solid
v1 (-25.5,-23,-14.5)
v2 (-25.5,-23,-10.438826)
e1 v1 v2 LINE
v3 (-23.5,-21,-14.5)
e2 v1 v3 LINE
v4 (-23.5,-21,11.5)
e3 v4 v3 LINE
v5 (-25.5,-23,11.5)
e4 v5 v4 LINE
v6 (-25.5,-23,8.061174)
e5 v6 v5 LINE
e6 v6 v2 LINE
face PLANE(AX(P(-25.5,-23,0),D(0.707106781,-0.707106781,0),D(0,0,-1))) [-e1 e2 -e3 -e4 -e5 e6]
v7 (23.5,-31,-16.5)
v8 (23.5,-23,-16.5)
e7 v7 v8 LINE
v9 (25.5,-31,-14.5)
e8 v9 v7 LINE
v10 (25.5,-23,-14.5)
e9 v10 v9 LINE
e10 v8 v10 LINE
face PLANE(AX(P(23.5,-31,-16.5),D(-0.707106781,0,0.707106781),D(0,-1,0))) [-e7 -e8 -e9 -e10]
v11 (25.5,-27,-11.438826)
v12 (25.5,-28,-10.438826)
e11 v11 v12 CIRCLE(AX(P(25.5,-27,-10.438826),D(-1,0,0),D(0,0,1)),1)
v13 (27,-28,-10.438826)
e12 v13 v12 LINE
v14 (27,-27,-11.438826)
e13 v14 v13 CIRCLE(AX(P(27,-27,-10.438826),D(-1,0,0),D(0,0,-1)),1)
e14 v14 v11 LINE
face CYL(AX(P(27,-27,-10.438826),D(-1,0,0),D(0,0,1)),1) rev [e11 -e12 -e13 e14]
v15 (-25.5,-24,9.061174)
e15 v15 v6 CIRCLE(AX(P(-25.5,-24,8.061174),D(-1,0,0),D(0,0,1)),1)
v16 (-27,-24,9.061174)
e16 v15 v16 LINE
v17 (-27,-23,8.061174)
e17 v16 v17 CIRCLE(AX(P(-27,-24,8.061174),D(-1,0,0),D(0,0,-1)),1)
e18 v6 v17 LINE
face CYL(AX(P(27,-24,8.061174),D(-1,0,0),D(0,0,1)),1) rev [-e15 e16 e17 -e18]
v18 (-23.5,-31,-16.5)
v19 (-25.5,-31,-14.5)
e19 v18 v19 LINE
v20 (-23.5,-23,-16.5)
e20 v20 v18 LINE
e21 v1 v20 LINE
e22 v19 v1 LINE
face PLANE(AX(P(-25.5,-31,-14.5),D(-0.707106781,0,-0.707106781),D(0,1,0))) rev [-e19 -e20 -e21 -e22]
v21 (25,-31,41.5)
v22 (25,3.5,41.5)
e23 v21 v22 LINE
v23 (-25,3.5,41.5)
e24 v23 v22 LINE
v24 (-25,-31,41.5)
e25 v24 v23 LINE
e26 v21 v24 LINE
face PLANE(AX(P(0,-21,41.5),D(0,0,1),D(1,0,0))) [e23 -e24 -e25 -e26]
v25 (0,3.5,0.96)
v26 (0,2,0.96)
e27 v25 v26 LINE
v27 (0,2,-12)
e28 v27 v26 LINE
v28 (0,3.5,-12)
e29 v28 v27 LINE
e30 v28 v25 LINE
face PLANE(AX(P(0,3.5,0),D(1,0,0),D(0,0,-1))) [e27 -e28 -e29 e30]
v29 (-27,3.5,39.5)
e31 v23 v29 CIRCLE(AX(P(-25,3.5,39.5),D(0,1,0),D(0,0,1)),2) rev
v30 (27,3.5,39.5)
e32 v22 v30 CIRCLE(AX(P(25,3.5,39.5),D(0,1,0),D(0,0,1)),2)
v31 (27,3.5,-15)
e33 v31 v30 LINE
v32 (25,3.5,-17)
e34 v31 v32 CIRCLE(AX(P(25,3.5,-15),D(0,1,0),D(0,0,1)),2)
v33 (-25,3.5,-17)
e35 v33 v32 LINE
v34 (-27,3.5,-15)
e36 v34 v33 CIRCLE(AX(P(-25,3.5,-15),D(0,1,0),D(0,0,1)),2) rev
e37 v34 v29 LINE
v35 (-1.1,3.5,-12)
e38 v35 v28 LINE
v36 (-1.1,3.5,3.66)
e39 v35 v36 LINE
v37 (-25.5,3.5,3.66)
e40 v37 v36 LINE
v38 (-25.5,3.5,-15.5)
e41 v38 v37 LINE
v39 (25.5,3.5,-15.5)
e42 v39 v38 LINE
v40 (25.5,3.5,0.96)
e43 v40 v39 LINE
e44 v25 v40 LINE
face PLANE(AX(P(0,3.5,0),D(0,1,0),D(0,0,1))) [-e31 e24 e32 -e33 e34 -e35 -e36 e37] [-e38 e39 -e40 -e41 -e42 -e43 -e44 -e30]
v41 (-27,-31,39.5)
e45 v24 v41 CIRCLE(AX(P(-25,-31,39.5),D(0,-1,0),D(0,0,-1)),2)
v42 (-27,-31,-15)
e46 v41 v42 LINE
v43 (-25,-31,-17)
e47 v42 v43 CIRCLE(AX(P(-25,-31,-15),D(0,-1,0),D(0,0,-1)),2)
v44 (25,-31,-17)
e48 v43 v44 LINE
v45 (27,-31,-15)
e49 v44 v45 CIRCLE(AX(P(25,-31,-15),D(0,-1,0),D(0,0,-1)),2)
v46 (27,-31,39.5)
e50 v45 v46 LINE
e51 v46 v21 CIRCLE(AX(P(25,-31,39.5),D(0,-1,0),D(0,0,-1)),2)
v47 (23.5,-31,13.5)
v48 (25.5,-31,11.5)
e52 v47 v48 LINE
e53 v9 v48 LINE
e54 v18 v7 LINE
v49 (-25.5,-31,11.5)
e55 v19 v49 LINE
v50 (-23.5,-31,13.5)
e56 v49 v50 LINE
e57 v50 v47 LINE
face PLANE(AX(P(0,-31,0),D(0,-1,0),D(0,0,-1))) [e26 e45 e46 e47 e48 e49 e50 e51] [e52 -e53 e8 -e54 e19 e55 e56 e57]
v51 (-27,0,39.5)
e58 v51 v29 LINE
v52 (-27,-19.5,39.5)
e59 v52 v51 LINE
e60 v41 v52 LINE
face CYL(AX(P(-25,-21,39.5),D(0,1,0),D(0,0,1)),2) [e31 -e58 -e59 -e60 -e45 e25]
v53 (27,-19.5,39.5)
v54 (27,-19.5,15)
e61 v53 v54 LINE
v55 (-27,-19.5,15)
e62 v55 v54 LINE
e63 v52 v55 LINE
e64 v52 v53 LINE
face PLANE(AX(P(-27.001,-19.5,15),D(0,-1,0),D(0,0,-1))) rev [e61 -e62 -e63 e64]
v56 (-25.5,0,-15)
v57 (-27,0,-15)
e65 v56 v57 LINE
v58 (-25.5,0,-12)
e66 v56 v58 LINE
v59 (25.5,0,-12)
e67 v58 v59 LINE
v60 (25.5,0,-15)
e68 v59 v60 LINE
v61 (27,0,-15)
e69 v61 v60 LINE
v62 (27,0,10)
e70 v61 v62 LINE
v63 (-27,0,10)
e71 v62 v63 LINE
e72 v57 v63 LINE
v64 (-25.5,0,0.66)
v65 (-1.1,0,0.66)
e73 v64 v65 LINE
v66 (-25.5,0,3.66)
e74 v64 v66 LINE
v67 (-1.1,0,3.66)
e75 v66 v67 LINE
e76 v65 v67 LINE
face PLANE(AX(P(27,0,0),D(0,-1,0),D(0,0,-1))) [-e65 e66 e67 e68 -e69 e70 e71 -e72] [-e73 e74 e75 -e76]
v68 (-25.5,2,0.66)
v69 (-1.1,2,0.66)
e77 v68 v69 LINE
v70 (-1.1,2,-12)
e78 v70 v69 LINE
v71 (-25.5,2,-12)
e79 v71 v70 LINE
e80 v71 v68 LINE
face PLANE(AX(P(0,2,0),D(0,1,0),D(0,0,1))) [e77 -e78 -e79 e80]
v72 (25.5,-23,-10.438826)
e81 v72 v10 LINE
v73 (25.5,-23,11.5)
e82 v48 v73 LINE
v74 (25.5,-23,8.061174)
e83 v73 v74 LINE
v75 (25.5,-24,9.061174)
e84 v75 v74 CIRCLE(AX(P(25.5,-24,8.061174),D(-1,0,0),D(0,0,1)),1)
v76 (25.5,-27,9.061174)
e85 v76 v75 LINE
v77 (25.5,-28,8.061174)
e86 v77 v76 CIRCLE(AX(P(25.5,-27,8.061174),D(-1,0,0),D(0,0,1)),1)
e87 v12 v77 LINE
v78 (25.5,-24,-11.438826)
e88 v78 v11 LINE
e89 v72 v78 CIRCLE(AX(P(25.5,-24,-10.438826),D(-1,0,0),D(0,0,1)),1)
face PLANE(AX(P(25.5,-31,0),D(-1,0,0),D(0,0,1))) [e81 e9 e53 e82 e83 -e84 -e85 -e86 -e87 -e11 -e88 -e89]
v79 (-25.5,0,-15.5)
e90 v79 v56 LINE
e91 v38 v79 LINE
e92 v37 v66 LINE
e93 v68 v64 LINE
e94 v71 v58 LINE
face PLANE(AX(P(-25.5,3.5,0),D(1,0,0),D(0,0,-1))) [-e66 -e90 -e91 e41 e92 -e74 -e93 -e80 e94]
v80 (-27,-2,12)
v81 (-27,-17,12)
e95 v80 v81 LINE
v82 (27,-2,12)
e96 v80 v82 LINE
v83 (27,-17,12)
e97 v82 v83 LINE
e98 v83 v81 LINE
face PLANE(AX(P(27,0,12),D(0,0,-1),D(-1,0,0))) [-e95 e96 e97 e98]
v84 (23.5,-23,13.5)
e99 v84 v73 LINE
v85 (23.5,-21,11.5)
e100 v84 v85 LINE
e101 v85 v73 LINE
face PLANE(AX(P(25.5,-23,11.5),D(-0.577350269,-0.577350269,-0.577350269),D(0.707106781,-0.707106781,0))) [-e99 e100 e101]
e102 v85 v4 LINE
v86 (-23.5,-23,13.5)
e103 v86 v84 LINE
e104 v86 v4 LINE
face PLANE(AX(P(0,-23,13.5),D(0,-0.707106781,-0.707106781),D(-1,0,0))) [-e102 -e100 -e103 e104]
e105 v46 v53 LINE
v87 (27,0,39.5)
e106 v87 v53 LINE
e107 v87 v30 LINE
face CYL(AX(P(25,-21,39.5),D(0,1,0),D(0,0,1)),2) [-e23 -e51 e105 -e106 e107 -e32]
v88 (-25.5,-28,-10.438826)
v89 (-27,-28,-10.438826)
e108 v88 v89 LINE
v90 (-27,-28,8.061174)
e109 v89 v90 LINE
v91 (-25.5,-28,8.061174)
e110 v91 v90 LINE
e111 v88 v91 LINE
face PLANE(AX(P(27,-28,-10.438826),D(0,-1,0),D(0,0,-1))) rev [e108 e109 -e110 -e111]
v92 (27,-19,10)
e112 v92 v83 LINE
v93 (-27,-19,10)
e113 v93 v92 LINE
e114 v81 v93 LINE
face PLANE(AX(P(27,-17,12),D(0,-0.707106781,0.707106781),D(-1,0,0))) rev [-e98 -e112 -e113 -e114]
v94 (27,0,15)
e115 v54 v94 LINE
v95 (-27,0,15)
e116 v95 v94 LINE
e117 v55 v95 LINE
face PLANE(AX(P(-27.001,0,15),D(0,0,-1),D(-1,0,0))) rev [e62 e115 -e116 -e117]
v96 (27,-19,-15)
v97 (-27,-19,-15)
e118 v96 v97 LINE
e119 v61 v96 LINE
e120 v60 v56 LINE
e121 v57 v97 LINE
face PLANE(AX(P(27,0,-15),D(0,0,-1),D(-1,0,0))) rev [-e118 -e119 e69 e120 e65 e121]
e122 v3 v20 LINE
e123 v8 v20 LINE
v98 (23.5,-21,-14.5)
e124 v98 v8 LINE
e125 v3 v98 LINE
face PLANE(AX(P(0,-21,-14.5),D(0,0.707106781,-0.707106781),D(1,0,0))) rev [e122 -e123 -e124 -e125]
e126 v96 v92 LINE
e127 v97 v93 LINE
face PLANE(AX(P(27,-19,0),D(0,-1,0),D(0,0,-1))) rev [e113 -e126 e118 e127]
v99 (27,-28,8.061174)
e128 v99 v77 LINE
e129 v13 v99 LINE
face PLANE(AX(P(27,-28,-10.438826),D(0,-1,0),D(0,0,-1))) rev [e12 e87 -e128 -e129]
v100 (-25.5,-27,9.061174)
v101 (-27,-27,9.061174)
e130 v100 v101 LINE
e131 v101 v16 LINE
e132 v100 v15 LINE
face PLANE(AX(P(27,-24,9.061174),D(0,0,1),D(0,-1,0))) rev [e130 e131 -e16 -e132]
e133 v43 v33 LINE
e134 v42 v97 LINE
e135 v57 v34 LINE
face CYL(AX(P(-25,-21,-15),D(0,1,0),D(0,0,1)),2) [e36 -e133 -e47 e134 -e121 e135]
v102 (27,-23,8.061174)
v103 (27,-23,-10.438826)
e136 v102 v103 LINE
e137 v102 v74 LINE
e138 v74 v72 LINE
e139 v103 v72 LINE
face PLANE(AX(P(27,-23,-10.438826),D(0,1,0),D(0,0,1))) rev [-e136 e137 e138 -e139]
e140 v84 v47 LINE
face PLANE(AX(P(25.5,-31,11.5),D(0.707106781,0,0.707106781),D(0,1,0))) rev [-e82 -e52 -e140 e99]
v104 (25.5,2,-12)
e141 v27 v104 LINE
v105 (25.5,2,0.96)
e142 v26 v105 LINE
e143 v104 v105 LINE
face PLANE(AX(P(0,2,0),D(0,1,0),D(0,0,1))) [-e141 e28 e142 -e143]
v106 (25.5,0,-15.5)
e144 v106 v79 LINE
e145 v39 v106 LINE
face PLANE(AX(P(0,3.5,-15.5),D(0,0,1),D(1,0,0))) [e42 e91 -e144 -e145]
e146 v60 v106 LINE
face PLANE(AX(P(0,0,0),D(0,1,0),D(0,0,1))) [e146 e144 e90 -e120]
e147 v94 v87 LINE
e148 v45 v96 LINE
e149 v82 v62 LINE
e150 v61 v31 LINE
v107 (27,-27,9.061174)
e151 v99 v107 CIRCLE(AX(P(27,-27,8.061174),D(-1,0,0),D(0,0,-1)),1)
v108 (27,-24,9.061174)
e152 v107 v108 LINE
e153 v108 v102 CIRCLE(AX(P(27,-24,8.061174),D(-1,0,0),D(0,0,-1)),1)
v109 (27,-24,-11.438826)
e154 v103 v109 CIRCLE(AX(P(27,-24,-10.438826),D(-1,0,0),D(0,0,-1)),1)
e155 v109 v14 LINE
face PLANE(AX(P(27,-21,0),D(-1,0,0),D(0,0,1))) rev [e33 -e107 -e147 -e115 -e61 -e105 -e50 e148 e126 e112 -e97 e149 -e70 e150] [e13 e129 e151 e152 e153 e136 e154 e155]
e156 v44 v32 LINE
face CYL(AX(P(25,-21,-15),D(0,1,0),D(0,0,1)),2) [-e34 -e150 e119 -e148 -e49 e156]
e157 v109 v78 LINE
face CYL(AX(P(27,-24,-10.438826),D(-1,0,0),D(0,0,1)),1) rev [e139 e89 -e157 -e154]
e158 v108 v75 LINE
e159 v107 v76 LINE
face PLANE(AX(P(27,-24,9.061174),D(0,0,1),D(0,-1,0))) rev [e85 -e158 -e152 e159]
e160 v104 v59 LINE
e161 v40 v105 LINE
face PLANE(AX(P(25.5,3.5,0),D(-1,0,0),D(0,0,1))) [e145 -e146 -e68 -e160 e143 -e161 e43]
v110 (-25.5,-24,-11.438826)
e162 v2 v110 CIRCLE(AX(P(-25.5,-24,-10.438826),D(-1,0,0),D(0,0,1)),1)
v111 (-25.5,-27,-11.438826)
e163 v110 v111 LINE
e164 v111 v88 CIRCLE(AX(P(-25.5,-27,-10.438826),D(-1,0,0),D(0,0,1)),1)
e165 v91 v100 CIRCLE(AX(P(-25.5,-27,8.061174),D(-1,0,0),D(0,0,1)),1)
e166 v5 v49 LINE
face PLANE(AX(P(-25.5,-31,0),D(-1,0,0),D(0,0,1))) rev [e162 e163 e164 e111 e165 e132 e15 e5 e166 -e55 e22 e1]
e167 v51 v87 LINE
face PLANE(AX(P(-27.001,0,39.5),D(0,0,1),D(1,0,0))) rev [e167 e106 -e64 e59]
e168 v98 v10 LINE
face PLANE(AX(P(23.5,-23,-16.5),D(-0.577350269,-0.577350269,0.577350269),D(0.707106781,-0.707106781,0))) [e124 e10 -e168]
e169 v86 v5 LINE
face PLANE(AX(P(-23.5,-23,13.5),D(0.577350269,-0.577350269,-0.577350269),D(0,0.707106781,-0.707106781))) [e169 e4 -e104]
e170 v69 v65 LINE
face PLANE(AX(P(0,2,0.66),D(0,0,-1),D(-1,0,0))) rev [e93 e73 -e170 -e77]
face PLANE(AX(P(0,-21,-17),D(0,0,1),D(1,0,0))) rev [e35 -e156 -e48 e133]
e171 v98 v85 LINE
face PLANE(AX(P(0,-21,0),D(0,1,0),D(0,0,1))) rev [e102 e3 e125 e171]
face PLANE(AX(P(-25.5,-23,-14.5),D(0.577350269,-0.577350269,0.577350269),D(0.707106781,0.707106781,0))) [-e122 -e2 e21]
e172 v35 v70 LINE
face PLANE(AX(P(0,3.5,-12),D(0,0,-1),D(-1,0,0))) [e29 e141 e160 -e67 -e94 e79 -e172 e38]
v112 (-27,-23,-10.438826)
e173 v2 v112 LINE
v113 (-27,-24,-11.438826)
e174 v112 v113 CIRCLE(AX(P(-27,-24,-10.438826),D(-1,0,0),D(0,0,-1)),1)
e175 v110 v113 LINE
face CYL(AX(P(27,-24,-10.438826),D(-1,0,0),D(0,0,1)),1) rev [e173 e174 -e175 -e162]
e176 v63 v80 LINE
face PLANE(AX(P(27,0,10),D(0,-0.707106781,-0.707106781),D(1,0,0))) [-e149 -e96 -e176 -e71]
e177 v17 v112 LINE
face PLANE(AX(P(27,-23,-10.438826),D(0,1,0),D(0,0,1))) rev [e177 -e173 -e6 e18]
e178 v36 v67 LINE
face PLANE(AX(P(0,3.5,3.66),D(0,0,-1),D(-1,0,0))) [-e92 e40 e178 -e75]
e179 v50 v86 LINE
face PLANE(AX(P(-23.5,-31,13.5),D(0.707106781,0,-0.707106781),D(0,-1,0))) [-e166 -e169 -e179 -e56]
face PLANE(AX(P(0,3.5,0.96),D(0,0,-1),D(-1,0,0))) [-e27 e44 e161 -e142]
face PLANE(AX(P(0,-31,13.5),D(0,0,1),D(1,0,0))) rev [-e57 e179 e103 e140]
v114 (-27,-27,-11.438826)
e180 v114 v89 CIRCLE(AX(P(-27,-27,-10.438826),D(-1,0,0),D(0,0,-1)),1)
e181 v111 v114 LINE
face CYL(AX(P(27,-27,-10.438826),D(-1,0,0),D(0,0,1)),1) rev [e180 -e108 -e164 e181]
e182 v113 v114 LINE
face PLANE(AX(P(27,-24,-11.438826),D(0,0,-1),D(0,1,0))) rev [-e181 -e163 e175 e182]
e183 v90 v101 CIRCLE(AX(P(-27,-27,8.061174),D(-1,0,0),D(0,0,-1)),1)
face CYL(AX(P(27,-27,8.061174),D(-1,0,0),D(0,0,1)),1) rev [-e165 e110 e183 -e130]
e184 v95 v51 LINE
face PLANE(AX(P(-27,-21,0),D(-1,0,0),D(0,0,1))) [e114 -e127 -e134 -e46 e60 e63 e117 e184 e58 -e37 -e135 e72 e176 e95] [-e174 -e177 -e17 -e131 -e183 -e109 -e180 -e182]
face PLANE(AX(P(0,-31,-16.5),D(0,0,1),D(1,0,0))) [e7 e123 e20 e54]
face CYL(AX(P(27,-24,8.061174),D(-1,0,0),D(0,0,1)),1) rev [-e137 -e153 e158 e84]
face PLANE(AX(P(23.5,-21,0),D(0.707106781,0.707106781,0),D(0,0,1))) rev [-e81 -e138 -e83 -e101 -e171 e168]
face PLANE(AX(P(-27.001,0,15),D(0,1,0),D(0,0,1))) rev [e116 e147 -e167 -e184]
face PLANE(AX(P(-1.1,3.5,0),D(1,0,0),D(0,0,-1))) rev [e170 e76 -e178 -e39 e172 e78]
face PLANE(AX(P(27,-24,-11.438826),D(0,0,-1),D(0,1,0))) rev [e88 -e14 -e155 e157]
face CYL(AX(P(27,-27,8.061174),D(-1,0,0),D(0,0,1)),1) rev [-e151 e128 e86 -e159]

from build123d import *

# Parameters (mm, degrees)
BOSS_EXTRUDE4_DEPTH = 21
BOSS_EXTRUDE5_START = 3.5
BOSS_EXTRUDE5_DEPTH = 3.5
SKETCH4_W           = 27
SKETCH4_H           = 19
CUT_EXTRUDE4_DEPTH  = 72.268857154
SKETCH3_5_W         = 24.4
SKETCH3_5_H         = 12.66
BOSS_EXTRUDE6_DEPTH = 2
SKETCH5_W           = 51
SKETCH5_H           = 30
BOSS_EXTRUDE7_DEPTH = 10
CUT_EXTRUDE5_DEPTH  = 75.828136419
CUT_EXTRUDE6_REACH  = 76.828
SKETCH8_W           = 24.5
SKETCH8_H           = 19.5
CHAMFER1_SIZE       = 2


with BuildPart() as part:
    # Sketch3 → Boss-Extrude4 (new body)
    with BuildSketch(Plane(origin=(0, 0, 0), x_dir=(1, 0, 0), z_dir=(0, 1, 0))):
        with BuildLine():
            Line((-27, 15), (-27, -39.5))
            ThreePointArc((-27, -39.5), (-26.414213562, -40.914213562), (-25, -41.5))
            Line((-25, -41.5), (25, -41.5))
            ThreePointArc((25, -41.5), (26.414213562, -40.914213562), (27, -39.5))
            Line((27, -39.5), (27, 15))
            ThreePointArc((27, 15), (26.414213562, 16.414213562), (25, 17))
            Line((25, 17), (-25, 17))
            ThreePointArc((-25, 17), (-26.414213562, 16.414213562), (-27, 15))
        make_face()
    extrude(amount=-BOSS_EXTRUDE4_DEPTH)

    # Sketch3<3> → Boss-Extrude5 (add)
    with BuildSketch(Plane(origin=(0, 0, 0), x_dir=(1, 0, 0), z_dir=(0, 1, 0)).offset(BOSS_EXTRUDE5_START)):
        with BuildLine():
            Line((-27, 15), (-27, -39.5))
            ThreePointArc((-27, -39.5), (-26.414213562, -40.914213562), (-25, -41.5))
            Line((-25, -41.5), (25, -41.5))
            ThreePointArc((25, -41.5), (26.414213562, -40.914213562), (27, -39.5))
            Line((27, -39.5), (27, 15))
            ThreePointArc((27, 15), (26.414213562, 16.414213562), (25, 17))
            Line((25, 17), (-25, 17))
            ThreePointArc((-25, 17), (-26.414213562, 16.414213562), (-27, 15))
        make_face()
        Polygon((0, 12), (-1.1, 12), (-1.1, -3.66), (-25.5, -3.66), (-25.5, 15.5), (25.5, 15.5), (25.5, -0.96), (0, -0.96), align=None, mode=Mode.SUBTRACT)
    extrude(amount=-BOSS_EXTRUDE5_DEPTH)

    # Sketch4 → Cut-Extrude4 (cut, through all)
    with BuildSketch(Plane.ZY.offset(27)):
        with Locations((-1.5, -9.5)):
            Rectangle(SKETCH4_W, SKETCH4_H)
    extrude(amount=-CUT_EXTRUDE4_DEPTH, mode=Mode.SUBTRACT)

    # Sketch3<5> → Boss-Extrude6 (add)
    with BuildSketch(Plane(origin=(0, 0, 0), x_dir=(1, 0, 0), z_dir=(0, 1, 0))):
        with Locations((-13.3, 5.67)):
            Rectangle(SKETCH3_5_W, SKETCH3_5_H)
        Polygon((25.5, 12), (0, 12), (0, -0.96), (25.5, -0.96), (25.5, -0.5), align=None)
    extrude(amount=BOSS_EXTRUDE6_DEPTH)

    # Sketch5 → Boss-Extrude7 (add)
    # profile 1 of 2: a face of its own
    with BuildSketch(Plane.XZ.offset(21)):
        with BuildLine():
            ThreePointArc((25, -17), (26.414213562, -16.414213562), (27, -15))
            Line((27, -15), (27, 39.5))
            ThreePointArc((27, 39.5), (26.414213562, 40.914213562), (25, 41.5))
            Line((25, 41.5), (-25, 41.5))
            ThreePointArc((-25, 41.5), (-26.414213562, 40.914213562), (-27, 39.5))
            Line((-27, 39.5), (-27, -15))
            ThreePointArc((-27, -15), (-26.414213562, -16.414213562), (-25, -17))
            Line((-25, -17), (25, -17))
        make_face()
        with Locations((0, -1.5)):
            Rectangle(SKETCH5_W, SKETCH5_H, mode=Mode.SUBTRACT)
    # profile 2 of 2: a face of its own
    with BuildSketch(Plane.XZ.offset(21)):
        with BuildLine():
            ThreePointArc((25, -17), (26.414213562, -16.414213562), (27, -15))
            Line((27, -15), (27, 39.5))
            ThreePointArc((27, 39.5), (26.414213562, 40.914213562), (25, 41.5))
            Line((25, 41.5), (-25, 41.5))
            ThreePointArc((-25, 41.5), (-26.414213562, 40.914213562), (-27, 39.5))
            Line((-27, 39.5), (-27, -15))
            ThreePointArc((-27, -15), (-26.414213562, -16.414213562), (-25, -17))
            Line((-25, -17), (25, -17))
        make_face()
        with Locations((0, -1.5)):
            Rectangle(SKETCH5_W, SKETCH5_H, mode=Mode.SUBTRACT)
    extrude(amount=BOSS_EXTRUDE7_DEPTH)

    # Sketch6 → Cut-Extrude5 (cut, through all)
    with BuildSketch(Plane.ZY.offset(27)):
        with BuildLine():
            Line((-10.438825699, -23), (8.061174301, -23))
            ThreePointArc((8.061174301, -23), (8.768281082, -23.292893219), (9.061174301, -24))
            Line((9.061174301, -24), (9.061174301, -27))
            ThreePointArc((9.061174301, -27), (8.768281082, -27.707106781), (8.061174301, -28))
            Line((8.061174301, -28), (-10.438825699, -28))
            ThreePointArc((-10.438825699, -28), (-11.14593248, -27.707106781), (-11.438825699, -27))
            Line((-11.438825699, -27), (-11.438825699, -24))
            ThreePointArc((-11.438825699, -24), (-11.14593248, -23.292893219), (-10.438825699, -23))
        make_face()
    extrude(amount=-CUT_EXTRUDE5_DEPTH, mode=Mode.SUBTRACT)

    # Sketch8 → Cut-Extrude6 (cut, up to next)
    with BuildSketch(Plane(origin=(27, 0, 0), x_dir=(0, 0, -1), z_dir=(1, 0, 0)), mode=Mode.PRIVATE) as cut_extrude6_sk1:
        with Locations((-27.25, -9.75)):
            Rectangle(SKETCH8_W, SKETCH8_H)
    cut_extrude6_tool1 = extrude(cut_extrude6_sk1.sketch, amount=-CUT_EXTRUDE6_REACH, mode=Mode.PRIVATE) & part.part
    add(cut_extrude6_tool1.solids().sort_by_distance((27, -9.75, 27.25))[0], mode=Mode.SUBTRACT)

    # Chamfer1
    chamfer1_edges = [part.edges().sort_by_distance(p)[0] for p in [
        (25.5, -26, -16.5),
        (-25.5, -21, -1.5),
        (-25.5, -26, -16.5),
        (0, -21, 13.5),
        (-25.5, -26, 13.5),
        (25.5, -26, 13.5),
        (0, -21, -16.5),
        (25.5, -21, -1.5),
        (0, 0, 12),
        (0, -19, 12),
    ]]
    chamfer(chamfer1_edges, length=CHAMFER1_SIZE - 0.0001)  # a hair under: the kernel refuses the full size


solid = part.part
